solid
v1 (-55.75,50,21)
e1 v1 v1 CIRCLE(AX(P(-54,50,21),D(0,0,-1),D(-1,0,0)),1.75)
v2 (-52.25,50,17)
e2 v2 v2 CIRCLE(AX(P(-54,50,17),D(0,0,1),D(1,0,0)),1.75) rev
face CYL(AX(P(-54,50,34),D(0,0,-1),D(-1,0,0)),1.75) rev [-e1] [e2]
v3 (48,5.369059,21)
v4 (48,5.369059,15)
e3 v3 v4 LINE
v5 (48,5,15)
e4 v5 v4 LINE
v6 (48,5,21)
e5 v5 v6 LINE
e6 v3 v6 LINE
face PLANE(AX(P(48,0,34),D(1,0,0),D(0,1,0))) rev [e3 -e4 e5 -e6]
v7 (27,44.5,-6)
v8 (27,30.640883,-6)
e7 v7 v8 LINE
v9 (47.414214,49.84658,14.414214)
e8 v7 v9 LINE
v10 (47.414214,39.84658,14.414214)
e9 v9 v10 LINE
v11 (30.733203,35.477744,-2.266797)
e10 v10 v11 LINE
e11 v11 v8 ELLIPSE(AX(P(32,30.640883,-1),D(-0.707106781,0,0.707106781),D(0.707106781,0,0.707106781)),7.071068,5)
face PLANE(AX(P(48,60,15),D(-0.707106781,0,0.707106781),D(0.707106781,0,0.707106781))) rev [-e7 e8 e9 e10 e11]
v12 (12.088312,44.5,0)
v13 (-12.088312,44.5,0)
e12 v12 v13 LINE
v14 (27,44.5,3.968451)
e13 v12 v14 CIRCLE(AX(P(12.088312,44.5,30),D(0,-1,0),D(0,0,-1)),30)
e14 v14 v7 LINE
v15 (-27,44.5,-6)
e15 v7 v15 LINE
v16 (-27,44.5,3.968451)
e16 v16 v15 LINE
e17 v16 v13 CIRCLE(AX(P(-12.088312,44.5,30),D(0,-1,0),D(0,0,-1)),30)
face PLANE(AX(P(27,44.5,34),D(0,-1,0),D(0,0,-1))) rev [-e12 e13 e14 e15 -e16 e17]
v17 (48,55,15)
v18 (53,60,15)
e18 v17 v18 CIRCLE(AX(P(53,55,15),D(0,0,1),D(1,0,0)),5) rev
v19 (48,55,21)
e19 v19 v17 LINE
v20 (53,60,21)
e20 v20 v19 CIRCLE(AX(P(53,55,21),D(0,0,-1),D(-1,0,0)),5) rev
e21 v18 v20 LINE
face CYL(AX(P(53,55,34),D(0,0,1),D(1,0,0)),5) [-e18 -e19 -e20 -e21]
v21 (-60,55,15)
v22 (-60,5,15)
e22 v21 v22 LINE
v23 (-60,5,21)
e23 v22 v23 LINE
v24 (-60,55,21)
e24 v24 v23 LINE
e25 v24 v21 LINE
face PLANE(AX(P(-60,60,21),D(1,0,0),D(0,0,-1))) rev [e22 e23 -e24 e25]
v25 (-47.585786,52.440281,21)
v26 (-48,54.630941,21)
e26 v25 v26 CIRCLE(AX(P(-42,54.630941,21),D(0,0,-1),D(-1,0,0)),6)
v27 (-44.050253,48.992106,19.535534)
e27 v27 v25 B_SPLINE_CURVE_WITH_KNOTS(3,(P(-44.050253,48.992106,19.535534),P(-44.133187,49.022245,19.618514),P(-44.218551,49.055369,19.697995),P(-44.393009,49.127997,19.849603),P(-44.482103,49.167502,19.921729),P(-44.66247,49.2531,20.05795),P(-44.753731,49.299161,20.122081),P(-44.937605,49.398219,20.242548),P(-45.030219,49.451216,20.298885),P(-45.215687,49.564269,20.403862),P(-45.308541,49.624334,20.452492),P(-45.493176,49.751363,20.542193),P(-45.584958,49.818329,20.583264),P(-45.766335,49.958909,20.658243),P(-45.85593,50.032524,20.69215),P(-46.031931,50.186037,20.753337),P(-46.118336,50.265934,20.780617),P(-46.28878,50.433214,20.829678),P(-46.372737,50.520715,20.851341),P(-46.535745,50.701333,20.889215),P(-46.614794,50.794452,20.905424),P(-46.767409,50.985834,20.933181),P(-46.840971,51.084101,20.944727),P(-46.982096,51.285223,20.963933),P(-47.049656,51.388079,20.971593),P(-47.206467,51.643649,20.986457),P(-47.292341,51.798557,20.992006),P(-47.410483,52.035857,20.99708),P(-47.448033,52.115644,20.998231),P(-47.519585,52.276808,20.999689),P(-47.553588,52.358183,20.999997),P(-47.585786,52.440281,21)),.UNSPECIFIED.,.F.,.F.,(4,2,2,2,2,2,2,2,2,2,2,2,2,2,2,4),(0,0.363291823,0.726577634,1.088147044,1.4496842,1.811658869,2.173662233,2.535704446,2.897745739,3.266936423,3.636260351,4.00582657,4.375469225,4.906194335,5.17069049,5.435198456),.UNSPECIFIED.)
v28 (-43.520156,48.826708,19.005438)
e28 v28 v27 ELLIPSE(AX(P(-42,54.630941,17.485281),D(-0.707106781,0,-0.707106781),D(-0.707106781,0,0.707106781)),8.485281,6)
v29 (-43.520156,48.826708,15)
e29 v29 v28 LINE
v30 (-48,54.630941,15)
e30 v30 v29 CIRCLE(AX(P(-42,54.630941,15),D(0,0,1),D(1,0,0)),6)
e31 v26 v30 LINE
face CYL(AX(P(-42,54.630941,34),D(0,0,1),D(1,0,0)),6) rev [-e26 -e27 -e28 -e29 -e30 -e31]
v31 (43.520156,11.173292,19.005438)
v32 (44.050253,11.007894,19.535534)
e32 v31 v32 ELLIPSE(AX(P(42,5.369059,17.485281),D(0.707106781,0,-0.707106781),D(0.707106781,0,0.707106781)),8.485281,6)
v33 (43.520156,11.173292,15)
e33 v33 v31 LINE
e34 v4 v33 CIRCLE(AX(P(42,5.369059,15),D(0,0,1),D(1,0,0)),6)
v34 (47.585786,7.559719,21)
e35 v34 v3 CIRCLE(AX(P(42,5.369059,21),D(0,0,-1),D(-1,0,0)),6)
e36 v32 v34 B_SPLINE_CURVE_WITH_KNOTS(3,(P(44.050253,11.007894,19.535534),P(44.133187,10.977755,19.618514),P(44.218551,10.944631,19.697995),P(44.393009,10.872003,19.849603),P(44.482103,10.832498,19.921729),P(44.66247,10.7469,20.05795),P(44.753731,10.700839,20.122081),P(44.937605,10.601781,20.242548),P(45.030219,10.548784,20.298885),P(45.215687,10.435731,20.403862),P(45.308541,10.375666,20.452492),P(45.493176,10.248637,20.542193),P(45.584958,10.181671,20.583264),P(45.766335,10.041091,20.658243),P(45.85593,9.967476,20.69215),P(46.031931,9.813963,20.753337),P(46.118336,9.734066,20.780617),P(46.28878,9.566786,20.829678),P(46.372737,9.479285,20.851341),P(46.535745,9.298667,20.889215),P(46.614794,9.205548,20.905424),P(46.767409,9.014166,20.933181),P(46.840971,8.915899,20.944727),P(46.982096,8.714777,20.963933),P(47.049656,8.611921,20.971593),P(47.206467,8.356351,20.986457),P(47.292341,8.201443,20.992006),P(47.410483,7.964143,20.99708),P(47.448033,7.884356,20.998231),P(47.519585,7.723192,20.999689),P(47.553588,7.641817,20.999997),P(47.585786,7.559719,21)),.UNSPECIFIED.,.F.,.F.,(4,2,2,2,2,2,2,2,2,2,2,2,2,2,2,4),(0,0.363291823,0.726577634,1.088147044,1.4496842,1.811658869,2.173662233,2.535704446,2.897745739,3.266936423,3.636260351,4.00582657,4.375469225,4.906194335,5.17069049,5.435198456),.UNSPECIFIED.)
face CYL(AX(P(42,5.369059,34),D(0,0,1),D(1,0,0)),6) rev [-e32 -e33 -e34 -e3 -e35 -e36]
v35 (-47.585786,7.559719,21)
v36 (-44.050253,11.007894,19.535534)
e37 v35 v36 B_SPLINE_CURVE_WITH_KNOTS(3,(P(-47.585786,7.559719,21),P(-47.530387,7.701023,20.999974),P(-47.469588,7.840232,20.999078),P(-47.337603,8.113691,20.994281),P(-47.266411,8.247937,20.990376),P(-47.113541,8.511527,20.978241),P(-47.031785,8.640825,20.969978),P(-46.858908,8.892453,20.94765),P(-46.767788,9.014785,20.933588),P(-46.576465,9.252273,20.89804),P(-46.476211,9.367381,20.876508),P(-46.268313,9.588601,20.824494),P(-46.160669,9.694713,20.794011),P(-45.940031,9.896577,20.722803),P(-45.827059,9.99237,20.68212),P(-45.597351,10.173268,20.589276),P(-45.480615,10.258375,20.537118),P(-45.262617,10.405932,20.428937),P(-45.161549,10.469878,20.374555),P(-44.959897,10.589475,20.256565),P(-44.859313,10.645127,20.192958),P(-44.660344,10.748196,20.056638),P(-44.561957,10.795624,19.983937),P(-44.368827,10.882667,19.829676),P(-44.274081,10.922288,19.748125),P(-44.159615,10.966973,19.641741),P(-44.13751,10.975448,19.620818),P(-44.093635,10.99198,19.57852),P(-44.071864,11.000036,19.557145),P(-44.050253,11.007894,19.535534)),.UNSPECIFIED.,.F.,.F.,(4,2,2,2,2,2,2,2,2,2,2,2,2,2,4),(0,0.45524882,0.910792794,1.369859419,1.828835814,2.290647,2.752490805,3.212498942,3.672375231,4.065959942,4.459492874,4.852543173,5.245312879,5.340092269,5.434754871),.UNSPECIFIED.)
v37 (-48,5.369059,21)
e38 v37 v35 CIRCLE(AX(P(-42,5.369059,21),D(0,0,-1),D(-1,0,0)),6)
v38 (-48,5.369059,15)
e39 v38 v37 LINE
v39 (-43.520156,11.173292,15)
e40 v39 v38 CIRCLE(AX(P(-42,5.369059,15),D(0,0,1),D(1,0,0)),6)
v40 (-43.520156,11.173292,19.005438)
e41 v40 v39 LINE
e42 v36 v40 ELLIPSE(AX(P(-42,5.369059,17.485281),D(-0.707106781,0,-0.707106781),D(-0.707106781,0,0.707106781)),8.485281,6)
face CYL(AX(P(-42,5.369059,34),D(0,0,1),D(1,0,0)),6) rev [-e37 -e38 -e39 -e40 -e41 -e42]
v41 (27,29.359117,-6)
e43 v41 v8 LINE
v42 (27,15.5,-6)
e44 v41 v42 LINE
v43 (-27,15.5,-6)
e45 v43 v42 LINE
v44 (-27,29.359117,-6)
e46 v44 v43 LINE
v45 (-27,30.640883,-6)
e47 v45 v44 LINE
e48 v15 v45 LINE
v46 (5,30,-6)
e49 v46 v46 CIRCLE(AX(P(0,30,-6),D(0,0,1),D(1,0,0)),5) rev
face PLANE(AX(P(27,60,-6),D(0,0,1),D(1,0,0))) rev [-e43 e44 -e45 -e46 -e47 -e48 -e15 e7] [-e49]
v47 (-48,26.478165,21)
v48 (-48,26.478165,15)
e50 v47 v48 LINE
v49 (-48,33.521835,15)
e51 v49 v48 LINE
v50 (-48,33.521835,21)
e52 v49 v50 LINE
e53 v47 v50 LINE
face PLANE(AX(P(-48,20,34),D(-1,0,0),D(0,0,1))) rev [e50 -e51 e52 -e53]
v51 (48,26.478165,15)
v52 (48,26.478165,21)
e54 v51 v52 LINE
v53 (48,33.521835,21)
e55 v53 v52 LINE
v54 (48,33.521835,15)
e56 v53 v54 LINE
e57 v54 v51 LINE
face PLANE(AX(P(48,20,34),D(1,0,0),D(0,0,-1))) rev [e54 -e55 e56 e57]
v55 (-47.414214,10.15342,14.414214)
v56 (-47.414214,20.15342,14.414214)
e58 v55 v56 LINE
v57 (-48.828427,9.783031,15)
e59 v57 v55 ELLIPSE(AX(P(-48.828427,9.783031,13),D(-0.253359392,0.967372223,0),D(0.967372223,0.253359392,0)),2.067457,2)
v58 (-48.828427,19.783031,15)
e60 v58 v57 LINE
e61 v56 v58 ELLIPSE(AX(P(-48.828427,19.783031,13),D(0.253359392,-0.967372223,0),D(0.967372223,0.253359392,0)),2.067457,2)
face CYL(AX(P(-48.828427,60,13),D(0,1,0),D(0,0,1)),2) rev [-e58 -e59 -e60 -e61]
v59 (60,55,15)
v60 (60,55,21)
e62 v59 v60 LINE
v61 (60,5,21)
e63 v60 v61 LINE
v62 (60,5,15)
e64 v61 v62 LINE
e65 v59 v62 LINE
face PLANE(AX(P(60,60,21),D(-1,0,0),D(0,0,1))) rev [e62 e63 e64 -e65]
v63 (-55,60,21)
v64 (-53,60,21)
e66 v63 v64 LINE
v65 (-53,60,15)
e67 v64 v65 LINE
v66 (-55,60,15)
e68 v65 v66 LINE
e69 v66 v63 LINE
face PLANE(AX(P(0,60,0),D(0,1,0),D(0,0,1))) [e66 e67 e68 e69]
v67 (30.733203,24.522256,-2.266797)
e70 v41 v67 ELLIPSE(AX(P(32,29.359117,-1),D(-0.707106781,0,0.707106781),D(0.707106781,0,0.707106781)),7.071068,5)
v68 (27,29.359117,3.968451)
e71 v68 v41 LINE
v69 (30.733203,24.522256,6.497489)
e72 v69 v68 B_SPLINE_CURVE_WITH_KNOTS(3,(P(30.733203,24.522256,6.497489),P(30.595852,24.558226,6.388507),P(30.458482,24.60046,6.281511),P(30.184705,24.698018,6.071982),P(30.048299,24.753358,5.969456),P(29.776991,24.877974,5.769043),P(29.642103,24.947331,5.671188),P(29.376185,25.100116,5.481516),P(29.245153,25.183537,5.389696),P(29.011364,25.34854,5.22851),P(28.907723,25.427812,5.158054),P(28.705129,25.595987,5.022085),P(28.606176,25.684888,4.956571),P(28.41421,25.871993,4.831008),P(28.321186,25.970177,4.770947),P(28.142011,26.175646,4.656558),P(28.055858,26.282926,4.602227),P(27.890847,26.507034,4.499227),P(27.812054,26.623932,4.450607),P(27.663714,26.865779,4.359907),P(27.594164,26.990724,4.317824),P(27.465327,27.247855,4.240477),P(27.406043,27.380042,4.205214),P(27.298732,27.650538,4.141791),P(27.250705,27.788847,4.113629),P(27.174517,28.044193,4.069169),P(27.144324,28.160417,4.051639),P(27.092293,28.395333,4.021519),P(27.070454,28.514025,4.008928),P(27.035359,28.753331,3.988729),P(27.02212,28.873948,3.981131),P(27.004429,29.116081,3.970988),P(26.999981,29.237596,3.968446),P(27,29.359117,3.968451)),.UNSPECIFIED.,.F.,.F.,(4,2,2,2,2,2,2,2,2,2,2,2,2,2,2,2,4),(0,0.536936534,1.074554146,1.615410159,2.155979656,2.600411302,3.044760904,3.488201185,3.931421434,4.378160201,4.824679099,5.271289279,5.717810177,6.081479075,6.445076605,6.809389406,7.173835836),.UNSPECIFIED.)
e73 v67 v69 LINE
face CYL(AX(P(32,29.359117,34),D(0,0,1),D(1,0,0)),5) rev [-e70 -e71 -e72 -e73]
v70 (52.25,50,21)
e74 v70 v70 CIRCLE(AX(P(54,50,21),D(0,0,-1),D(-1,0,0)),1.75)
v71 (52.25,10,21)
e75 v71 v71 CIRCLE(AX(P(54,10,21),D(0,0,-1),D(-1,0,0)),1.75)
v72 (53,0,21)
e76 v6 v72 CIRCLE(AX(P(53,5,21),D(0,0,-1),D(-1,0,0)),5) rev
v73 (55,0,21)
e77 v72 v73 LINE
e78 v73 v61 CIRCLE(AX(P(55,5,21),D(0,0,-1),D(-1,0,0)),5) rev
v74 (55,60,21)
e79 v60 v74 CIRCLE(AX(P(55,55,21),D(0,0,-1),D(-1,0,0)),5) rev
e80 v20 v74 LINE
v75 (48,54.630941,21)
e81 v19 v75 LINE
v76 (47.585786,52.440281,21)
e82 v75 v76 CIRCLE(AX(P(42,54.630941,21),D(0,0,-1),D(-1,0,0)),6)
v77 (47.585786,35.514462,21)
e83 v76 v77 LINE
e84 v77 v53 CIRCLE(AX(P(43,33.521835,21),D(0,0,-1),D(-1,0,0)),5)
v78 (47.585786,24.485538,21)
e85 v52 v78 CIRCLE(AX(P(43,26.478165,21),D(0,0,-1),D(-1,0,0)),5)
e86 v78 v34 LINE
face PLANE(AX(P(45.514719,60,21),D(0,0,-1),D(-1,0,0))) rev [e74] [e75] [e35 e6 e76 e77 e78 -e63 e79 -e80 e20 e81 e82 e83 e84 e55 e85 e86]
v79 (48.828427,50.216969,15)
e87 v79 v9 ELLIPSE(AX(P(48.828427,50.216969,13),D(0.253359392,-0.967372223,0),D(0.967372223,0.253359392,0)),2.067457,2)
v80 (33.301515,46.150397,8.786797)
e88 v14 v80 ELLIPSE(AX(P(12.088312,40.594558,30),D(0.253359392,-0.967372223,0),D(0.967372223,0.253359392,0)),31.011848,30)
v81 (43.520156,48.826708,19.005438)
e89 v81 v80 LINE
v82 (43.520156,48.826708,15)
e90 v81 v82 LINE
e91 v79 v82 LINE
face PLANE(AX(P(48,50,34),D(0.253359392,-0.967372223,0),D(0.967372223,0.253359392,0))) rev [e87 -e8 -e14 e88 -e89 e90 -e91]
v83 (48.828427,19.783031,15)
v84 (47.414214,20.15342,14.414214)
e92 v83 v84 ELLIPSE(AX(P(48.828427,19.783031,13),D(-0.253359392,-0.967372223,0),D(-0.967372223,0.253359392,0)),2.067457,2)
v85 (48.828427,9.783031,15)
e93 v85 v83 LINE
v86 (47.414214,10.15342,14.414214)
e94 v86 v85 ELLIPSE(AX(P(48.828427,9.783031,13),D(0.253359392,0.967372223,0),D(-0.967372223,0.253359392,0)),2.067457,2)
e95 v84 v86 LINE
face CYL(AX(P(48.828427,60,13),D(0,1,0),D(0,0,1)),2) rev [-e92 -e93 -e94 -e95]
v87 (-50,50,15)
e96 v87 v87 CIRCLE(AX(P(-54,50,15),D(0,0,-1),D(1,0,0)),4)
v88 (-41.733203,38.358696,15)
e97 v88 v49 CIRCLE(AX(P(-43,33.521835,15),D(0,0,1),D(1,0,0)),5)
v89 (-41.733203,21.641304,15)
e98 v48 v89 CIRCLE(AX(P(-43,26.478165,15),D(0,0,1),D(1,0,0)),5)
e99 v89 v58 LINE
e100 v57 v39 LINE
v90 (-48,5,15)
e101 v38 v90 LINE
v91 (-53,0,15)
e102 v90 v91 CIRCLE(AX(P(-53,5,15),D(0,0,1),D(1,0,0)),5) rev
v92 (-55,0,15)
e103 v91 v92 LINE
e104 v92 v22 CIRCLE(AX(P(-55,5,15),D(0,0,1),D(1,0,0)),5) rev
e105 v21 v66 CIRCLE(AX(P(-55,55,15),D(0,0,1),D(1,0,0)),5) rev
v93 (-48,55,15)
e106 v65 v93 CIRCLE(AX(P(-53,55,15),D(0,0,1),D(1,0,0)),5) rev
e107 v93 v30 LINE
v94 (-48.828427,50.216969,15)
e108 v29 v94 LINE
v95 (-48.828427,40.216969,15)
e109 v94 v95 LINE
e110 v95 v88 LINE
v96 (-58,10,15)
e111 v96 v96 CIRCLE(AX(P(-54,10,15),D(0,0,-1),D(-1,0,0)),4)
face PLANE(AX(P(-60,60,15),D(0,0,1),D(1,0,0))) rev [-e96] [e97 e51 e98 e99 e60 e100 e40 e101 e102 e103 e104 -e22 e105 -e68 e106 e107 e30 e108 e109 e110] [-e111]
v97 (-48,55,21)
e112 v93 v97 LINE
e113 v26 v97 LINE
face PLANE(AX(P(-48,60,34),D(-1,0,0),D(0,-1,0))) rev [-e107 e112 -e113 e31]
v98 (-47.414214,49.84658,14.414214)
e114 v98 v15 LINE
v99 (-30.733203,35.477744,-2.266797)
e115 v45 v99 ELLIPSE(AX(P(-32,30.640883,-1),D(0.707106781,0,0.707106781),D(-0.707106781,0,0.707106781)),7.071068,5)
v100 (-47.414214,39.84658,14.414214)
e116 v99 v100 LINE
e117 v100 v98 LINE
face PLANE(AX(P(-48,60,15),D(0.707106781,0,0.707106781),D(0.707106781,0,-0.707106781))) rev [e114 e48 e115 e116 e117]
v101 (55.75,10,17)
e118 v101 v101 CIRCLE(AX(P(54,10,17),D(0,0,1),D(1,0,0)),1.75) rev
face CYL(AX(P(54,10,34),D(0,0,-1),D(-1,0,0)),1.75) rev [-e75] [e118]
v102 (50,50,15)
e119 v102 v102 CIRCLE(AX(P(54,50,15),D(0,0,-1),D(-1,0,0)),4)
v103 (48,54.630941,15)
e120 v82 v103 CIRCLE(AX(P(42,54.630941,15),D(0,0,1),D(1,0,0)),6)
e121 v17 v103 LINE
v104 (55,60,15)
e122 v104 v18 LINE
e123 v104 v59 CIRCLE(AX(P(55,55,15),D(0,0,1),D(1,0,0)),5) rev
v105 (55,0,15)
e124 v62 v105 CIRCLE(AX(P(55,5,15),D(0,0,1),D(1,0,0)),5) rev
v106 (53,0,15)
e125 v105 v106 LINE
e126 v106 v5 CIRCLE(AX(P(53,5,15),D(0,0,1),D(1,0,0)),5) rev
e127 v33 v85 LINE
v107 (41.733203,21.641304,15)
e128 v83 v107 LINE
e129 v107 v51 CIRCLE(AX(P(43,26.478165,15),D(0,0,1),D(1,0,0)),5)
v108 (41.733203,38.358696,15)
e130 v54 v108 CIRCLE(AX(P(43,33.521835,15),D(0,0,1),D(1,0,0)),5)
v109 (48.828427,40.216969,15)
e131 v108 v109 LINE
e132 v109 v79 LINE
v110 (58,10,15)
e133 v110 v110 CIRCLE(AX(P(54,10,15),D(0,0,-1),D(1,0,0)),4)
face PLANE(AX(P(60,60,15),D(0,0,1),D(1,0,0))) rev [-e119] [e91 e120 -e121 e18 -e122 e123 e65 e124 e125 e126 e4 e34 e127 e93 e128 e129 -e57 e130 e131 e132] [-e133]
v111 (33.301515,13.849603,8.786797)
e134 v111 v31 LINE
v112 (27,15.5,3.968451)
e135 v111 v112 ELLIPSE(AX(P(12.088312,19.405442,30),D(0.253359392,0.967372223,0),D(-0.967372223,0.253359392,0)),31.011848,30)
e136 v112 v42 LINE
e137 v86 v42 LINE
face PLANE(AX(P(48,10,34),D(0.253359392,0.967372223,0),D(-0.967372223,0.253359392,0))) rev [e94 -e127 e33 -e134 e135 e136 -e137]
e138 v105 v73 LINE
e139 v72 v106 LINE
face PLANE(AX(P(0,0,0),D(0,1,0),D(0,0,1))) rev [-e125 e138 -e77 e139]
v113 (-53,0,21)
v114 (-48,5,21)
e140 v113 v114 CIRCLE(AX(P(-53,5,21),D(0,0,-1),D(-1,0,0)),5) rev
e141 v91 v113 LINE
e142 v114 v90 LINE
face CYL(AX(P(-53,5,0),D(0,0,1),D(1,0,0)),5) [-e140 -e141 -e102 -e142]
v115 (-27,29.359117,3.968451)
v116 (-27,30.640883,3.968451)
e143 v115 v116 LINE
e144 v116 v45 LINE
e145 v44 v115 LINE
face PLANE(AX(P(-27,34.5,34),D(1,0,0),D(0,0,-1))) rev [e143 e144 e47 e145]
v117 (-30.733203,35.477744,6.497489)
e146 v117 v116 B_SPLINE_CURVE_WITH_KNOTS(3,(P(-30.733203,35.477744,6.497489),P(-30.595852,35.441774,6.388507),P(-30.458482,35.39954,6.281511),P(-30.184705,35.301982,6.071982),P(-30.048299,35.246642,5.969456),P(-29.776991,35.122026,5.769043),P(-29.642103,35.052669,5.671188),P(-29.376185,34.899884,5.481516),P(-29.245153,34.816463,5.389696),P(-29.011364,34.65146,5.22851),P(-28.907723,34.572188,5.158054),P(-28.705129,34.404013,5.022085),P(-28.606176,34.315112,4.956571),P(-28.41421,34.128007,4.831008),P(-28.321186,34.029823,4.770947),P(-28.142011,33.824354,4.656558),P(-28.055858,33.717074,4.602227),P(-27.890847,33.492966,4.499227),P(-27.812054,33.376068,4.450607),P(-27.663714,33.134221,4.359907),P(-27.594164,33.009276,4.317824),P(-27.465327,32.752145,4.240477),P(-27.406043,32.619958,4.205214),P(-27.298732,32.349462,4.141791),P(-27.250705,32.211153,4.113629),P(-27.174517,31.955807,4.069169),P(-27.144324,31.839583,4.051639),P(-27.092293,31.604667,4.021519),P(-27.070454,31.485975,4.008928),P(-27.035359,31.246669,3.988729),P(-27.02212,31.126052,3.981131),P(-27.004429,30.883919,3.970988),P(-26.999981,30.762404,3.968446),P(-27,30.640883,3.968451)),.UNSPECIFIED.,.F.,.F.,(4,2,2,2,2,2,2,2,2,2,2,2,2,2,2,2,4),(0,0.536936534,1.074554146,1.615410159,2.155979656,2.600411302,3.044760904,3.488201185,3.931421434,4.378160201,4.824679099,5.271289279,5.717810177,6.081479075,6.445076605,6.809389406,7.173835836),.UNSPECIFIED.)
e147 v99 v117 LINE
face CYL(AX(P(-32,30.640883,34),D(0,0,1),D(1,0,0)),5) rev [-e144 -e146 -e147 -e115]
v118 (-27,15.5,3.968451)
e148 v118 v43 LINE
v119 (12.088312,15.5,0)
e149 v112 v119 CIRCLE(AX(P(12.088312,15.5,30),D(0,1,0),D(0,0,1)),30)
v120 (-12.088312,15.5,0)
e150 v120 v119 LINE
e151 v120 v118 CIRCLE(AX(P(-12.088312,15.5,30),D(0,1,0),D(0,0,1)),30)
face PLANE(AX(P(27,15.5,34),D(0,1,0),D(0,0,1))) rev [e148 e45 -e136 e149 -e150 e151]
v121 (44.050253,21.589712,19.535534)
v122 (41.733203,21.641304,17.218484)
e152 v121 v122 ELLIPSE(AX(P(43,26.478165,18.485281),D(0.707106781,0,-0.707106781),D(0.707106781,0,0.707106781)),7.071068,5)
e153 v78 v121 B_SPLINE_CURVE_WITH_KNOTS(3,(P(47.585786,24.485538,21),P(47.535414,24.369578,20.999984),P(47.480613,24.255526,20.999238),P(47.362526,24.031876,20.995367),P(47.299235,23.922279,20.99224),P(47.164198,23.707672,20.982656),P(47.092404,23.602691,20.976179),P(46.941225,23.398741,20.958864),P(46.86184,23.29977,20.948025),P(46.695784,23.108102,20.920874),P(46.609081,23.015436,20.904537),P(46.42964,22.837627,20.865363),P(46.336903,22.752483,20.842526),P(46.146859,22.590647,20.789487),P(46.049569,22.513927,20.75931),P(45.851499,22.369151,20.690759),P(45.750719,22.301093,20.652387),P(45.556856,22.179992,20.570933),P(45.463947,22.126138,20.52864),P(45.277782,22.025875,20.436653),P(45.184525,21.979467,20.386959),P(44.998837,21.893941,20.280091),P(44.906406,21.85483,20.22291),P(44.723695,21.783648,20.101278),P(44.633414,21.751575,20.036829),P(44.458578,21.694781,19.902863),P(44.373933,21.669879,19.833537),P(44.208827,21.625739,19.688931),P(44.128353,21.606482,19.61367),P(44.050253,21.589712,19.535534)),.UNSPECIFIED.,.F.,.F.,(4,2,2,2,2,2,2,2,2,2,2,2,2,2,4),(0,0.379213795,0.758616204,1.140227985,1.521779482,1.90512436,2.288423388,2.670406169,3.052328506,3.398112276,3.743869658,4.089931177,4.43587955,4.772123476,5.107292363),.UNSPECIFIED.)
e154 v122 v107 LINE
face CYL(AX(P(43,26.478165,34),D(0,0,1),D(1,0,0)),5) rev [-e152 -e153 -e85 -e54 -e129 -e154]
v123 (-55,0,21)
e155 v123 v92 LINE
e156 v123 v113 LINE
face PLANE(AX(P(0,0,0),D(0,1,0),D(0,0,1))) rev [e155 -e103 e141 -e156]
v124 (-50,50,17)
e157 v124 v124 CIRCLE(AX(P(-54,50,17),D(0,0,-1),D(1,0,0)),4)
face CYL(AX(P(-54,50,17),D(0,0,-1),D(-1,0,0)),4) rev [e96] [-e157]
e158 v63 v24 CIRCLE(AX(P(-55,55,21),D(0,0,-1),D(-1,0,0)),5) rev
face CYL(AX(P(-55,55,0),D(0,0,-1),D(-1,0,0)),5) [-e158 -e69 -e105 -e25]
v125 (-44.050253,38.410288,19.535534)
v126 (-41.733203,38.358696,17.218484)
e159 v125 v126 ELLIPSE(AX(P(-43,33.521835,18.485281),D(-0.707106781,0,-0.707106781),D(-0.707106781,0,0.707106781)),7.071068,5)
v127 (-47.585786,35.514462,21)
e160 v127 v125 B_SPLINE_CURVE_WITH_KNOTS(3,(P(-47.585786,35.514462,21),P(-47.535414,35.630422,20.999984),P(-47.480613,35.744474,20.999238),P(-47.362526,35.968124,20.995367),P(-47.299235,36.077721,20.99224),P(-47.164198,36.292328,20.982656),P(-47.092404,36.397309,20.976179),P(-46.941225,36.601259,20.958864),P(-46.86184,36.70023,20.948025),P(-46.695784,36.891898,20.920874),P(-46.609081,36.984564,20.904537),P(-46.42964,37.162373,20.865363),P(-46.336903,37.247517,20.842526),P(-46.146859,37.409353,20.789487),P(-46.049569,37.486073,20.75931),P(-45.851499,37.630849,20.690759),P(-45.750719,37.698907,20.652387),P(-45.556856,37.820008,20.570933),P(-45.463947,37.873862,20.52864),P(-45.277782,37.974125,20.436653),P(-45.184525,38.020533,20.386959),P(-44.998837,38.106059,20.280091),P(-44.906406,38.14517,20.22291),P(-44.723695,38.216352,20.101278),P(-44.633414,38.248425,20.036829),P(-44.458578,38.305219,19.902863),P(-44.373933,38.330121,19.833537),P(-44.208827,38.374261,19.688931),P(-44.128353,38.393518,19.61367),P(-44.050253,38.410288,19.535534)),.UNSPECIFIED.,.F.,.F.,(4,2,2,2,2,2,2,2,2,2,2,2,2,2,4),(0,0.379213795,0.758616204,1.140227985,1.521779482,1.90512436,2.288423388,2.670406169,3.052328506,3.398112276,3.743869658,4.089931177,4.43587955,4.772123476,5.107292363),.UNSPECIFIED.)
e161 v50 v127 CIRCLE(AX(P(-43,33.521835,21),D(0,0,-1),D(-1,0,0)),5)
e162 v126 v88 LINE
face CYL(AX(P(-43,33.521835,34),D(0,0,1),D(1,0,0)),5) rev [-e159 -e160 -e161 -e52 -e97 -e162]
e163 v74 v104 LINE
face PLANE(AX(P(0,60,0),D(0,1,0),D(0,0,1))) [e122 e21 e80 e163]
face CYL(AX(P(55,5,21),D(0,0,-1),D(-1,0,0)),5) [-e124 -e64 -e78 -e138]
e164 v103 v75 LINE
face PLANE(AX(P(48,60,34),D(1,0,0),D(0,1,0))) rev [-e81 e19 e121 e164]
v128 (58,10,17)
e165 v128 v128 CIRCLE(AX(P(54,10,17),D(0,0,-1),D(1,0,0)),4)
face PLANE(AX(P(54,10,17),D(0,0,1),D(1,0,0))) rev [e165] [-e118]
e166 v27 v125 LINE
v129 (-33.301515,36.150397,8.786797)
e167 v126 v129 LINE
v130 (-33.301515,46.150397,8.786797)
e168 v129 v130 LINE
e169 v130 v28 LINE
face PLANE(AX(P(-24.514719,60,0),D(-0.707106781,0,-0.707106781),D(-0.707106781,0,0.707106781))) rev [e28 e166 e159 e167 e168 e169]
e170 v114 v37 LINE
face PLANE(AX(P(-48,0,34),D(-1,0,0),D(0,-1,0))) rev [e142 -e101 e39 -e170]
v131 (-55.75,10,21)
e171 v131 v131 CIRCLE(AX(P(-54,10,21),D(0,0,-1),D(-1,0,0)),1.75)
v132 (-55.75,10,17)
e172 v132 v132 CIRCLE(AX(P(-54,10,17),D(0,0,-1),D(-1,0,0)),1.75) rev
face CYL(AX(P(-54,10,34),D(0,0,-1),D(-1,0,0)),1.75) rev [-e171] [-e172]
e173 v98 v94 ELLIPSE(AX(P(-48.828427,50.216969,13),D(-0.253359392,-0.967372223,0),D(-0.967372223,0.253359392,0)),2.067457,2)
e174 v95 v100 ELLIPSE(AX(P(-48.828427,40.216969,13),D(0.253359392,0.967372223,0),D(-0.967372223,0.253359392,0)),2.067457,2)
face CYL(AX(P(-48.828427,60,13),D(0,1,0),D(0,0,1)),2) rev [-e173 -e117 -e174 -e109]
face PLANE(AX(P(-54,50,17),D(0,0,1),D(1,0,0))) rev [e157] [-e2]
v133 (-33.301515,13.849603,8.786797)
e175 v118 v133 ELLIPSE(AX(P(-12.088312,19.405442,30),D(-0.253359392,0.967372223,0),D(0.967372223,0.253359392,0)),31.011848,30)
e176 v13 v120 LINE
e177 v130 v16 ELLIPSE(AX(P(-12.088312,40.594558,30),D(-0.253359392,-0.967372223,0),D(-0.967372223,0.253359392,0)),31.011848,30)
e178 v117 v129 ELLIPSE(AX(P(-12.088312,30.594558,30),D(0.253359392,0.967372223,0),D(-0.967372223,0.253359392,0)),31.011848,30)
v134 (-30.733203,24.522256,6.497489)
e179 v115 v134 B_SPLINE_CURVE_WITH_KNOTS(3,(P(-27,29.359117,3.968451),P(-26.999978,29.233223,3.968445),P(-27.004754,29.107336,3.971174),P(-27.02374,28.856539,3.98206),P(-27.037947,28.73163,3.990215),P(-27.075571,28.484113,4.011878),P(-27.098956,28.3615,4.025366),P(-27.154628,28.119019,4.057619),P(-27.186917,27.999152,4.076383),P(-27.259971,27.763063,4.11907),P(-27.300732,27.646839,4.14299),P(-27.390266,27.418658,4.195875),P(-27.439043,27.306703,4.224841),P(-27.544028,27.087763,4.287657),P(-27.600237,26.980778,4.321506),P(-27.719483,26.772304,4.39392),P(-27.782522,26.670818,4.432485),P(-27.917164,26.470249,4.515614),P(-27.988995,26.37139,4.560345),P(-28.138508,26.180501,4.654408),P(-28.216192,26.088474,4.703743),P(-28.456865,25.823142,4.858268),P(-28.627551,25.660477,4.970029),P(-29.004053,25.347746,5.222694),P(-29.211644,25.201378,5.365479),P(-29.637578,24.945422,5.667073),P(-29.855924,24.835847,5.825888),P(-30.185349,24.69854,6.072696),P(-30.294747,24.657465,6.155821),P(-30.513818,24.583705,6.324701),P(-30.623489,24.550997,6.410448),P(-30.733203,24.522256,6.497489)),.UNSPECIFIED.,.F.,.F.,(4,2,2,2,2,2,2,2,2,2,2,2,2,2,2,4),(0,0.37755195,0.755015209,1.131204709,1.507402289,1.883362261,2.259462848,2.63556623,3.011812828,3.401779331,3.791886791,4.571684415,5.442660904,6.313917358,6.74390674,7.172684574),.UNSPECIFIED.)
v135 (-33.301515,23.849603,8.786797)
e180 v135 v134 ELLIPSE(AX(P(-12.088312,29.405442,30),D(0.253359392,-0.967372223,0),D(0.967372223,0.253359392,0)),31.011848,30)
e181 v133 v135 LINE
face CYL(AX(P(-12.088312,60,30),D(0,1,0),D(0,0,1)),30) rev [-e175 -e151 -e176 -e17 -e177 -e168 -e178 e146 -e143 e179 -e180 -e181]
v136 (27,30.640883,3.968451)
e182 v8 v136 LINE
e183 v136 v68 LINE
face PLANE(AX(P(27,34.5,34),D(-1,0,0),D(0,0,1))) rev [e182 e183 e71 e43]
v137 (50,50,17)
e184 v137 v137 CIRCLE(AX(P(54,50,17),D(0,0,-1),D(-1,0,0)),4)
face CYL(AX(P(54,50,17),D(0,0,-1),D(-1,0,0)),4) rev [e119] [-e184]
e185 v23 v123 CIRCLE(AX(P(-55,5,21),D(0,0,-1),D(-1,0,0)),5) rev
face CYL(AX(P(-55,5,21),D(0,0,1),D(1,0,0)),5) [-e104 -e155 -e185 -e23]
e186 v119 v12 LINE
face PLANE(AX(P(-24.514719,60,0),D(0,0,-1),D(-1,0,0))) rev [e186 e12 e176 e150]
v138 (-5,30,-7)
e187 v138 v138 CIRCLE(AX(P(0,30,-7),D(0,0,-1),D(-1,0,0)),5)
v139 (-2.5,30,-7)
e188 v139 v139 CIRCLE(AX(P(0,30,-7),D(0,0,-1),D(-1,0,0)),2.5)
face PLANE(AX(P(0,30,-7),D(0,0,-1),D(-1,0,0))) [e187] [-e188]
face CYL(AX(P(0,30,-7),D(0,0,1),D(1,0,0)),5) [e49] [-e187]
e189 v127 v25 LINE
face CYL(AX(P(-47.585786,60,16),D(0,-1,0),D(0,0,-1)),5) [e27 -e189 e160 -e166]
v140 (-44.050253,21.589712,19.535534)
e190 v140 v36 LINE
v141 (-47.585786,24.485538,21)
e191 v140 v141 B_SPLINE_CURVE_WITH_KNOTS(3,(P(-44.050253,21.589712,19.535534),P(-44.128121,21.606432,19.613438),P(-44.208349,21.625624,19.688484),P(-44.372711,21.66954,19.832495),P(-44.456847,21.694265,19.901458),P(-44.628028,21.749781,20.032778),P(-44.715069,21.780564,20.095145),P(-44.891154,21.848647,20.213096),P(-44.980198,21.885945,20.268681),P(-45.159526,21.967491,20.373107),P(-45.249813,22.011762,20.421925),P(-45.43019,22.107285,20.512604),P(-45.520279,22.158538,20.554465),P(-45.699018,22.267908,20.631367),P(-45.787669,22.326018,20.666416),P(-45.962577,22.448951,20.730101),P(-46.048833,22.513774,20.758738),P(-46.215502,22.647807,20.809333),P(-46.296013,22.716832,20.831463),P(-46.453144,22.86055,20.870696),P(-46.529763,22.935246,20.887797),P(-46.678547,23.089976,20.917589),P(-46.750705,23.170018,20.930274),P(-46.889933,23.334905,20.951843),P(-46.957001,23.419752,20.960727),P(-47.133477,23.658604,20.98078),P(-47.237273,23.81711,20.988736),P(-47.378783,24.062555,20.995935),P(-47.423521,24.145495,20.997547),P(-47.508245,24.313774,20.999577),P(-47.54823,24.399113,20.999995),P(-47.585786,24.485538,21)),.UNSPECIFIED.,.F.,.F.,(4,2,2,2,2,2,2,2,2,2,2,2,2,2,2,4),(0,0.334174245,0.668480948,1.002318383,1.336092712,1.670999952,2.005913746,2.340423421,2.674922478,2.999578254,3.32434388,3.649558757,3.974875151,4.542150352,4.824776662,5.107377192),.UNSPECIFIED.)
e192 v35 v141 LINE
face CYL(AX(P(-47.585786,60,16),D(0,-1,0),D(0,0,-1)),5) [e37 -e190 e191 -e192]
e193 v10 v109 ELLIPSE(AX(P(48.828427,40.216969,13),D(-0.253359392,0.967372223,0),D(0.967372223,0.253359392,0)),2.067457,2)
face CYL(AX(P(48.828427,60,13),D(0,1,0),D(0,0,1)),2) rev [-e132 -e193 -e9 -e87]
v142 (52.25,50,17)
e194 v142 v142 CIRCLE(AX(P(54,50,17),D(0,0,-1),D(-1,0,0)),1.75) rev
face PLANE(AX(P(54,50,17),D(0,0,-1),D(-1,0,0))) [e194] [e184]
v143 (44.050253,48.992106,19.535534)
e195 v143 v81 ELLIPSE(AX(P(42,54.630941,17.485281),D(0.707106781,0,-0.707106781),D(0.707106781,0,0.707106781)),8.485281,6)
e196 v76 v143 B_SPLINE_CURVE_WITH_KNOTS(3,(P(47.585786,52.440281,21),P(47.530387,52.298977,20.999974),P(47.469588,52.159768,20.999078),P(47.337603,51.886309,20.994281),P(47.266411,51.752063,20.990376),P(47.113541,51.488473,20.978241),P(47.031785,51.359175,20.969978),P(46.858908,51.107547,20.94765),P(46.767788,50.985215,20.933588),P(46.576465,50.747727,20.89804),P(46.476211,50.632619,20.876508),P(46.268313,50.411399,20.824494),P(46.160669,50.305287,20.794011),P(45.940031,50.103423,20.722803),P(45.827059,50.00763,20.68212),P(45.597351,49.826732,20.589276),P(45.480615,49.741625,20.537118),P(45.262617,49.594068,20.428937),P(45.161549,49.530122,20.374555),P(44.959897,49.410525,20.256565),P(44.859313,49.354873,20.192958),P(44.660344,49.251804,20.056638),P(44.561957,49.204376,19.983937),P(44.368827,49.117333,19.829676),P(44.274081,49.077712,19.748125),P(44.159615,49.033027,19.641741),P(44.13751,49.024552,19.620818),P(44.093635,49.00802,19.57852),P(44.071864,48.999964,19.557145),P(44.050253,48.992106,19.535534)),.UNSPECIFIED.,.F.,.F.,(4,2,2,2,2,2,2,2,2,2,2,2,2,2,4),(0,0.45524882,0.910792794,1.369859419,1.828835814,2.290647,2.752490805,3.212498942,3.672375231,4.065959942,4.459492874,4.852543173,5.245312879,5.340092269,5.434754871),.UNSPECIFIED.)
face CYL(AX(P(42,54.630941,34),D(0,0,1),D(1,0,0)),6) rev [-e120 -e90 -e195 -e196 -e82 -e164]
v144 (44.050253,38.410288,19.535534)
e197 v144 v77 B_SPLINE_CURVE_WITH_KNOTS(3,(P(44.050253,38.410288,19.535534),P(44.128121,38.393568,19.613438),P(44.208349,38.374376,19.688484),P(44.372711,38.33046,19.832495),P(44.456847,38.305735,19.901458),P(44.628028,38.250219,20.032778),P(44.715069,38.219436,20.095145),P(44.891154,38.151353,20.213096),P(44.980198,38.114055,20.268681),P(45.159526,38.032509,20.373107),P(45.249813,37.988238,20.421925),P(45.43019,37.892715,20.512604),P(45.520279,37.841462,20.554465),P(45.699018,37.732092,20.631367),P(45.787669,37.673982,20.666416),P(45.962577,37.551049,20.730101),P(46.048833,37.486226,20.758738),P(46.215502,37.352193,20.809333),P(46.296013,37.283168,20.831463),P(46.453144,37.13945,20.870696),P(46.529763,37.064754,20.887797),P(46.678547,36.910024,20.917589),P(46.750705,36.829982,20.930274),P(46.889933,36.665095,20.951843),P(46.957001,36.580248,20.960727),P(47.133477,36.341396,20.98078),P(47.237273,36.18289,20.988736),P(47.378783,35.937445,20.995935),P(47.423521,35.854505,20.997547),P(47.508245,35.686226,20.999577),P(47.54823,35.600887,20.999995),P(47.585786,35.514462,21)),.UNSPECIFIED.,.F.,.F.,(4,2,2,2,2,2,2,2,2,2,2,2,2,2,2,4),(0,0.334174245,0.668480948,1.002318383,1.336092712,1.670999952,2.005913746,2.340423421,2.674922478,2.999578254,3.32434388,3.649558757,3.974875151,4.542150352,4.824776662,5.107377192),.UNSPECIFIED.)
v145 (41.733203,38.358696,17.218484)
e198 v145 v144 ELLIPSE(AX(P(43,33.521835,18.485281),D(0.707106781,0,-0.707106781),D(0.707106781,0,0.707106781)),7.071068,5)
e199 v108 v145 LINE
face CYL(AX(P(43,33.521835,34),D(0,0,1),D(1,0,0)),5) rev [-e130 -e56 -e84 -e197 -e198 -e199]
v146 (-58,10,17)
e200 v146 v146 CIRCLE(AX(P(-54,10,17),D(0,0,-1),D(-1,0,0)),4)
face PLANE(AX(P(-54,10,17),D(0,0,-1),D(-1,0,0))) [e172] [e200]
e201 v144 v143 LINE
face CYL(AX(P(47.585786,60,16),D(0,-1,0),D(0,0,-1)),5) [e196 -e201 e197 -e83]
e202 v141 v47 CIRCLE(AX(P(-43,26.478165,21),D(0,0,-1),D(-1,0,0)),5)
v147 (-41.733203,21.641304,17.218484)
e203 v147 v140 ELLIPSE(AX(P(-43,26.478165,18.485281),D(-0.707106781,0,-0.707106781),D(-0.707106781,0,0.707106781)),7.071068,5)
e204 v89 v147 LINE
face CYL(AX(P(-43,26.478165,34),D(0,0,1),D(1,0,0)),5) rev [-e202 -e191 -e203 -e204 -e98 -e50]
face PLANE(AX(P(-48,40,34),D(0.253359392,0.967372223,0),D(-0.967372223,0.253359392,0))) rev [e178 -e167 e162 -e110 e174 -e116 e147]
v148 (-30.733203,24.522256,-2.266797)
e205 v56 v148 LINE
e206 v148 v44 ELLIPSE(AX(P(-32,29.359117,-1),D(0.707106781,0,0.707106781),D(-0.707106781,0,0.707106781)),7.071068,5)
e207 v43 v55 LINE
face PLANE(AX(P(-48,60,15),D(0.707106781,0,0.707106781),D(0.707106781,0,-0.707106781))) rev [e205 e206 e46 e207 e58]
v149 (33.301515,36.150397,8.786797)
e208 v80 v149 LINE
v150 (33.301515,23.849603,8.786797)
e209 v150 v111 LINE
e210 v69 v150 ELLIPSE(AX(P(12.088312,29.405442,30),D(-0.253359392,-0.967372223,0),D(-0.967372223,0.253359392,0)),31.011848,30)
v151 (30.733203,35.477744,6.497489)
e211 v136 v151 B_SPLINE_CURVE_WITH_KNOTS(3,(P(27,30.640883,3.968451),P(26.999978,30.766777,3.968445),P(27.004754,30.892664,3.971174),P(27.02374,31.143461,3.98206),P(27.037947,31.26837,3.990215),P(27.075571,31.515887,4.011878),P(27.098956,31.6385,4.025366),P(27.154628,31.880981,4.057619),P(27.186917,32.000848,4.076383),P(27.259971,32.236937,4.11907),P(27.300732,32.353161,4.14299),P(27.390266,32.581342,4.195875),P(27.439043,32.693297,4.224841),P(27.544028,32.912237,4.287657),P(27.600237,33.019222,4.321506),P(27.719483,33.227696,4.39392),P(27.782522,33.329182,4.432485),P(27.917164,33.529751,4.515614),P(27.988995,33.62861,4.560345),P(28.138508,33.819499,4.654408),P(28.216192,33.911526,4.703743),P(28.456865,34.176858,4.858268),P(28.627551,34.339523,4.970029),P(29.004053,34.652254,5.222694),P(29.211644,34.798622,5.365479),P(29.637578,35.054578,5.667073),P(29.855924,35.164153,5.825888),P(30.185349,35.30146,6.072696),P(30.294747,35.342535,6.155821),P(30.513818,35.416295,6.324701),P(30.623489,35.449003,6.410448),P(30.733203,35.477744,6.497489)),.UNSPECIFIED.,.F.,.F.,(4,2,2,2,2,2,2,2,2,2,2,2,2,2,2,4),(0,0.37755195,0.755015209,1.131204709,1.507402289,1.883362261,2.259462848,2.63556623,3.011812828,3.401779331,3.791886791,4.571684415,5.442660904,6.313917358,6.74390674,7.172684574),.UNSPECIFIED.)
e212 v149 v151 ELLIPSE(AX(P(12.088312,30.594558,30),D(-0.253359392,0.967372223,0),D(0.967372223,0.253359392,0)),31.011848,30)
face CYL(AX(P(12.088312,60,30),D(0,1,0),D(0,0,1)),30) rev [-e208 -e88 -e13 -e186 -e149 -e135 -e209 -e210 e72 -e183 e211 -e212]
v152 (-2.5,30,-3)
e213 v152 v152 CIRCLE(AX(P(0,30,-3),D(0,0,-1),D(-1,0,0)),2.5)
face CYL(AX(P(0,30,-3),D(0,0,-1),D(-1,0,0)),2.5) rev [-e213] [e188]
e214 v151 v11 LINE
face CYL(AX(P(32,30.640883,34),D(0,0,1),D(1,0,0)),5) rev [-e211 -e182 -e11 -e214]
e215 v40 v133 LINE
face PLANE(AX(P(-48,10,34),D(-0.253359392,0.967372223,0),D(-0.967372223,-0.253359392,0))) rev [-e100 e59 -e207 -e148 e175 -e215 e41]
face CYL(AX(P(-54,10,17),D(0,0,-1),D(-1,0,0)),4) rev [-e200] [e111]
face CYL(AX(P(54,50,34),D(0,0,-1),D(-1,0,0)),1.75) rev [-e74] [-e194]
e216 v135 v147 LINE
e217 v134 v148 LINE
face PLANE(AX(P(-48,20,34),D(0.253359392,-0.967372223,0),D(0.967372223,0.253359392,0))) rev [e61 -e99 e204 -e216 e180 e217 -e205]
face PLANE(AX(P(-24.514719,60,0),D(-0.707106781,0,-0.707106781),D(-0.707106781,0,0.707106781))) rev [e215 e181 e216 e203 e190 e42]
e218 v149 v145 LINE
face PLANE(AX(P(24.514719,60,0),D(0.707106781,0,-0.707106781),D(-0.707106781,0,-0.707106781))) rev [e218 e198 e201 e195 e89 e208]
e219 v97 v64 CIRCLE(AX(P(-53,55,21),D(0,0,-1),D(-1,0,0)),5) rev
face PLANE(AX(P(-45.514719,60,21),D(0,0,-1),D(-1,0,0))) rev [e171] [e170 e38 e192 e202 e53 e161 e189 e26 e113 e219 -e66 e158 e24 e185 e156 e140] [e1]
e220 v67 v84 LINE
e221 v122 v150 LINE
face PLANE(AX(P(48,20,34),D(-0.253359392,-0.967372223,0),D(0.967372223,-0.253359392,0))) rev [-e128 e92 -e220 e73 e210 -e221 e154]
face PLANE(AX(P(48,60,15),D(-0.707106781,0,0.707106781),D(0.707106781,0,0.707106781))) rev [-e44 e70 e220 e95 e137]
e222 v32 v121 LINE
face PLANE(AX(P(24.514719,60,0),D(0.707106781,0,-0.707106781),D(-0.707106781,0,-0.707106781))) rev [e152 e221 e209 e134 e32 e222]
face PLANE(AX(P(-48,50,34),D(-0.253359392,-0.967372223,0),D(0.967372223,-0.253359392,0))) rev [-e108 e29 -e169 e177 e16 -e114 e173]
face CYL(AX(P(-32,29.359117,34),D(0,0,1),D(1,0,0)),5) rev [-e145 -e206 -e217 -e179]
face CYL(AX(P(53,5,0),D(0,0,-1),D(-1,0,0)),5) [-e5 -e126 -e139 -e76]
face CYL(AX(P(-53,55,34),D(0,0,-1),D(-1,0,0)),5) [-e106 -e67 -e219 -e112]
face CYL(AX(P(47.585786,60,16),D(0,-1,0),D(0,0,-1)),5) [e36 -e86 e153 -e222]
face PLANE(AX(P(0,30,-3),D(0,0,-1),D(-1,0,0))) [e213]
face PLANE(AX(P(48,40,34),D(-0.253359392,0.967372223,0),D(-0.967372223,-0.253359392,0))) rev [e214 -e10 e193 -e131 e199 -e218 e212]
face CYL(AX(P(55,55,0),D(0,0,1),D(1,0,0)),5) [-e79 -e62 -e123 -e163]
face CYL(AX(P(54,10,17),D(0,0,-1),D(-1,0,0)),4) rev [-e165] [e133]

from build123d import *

# Parameters (mm, degrees)
EXTRUDE_1_DEPTH     = 60
SKETCH_2_R          = 1.75
CUT_EXTRUDE_1_DEPTH = 40
SKETCH_3_R          = 4
CUT_EXTRUDE_2_DEPTH = 2
SKETCH_4_R          = 2.5
CUT_EXTRUDE_3_DEPTH = 3
EXTRUDE_START       = 1
SKETCH_5_R          = 5
SKETCH_5_R_2        = 2.5
EXTRUDE_2_DEPTH     = 1
FILLET_1_R          = 5
FILLET_2_R          = 30
FILLET_4_R          = 2
FILLET_5_R          = 5
FILLET_6_R          = 6
FILLET_7_R          = 5


with BuildPart() as part:
    # 草图1 → 凸台-拉伸1 (new body)
    with BuildSketch(Plane(origin=(0, 0, 0), x_dir=(1, 0, 0), z_dir=(0, 1, 0))):
        Polygon((-24.514718626, 0), (24.514718626, 0), (45.514718626, -21), (60, -21), (60, -15), (48, -15), (27, 6), (-27, 6), (-48, -15), (-60, -15), (-60, -21), (-45.514718626, -21), align=None)
    extrude(amount=EXTRUDE_1_DEPTH)

    # 草图2 → 切除-拉伸1 (cut)
    with BuildSketch(Plane(origin=(0, 0, -6), x_dir=(-1, 0, 0), z_dir=(0, 0, -1))):
        with Locations((-54, 50)):
            Circle(SKETCH_2_R)
        with Locations((-54, 10)):
            Circle(SKETCH_2_R)
        with Locations((54, 10)):
            Circle(SKETCH_2_R)
        with Locations((54, 50)):
            Circle(SKETCH_2_R)
        Polygon((-48, 60), (-48, 50), (-27, 44.5), (27, 44.5), (48, 50), (48, 60), align=None)
        Polygon((48, 0), (48, 10), (27, 15.5), (-27, 15.5), (-48, 10), (-48, 0), align=None)
        Polygon((-48, 40), (-27, 34.5), (-27, 25.5), (-48, 20), align=None)
        Polygon((48, 20), (27, 25.5), (27, 34.5), (48, 40), align=None)
    extrude(amount=-CUT_EXTRUDE_1_DEPTH, mode=Mode.SUBTRACT)

    # 草图3 → 切除-拉伸2 (cut)
    with BuildSketch(Plane(origin=(0, 0, 15), x_dir=(-1, 0, 0), z_dir=(0, 0, -1))):
        with Locations((-54, 50)):
            Circle(SKETCH_3_R)
        with Locations(Location((-54, 10, 0), (0, 0, 180))):
            Circle(SKETCH_3_R)
        with Locations((54, 10)):
            Circle(SKETCH_3_R)
        with Locations(Location((54, 50, 0), (0, 0, 180))):
            Circle(SKETCH_3_R)
    extrude(amount=-CUT_EXTRUDE_2_DEPTH, mode=Mode.SUBTRACT)

    # 草图4 → 切除-拉伸3 (cut)
    with BuildSketch(Plane(origin=(0, 0, -6), x_dir=(-1, 0, 0), z_dir=(0, 0, -1))):
        with Locations((0, 30)):
            Circle(SKETCH_4_R)
    extrude(amount=-CUT_EXTRUDE_3_DEPTH, mode=Mode.SUBTRACT)

    # 草图5 → 凸台-拉伸2 (add)
    with BuildSketch(Plane(origin=(0, 0, -6), x_dir=(-1, 0, 0), z_dir=(0, 0, -1)).offset(EXTRUDE_START)):
        with Locations(Location((0, 30, 0), (0, 0, 180))):
            Circle(SKETCH_5_R)
        with Locations((0, 30)):
            Circle(SKETCH_5_R_2, mode=Mode.SUBTRACT)
    extrude(amount=-EXTRUDE_2_DEPTH)

    # 圆角1
    fillet_1_edges = [part.edges().sort_by_distance(p)[0] for p in [
        (60, 60, 18),
        (-60, 0, 18),
        (60, 0, 18),
        (-48, 0, 18),
        (48, 0, 18),
        (-60, 60, 18),
        (48, 60, 18),
        (-48, 60, 18),
    ]]
    fillet(fillet_1_edges, radius=FILLET_1_R)

    # 圆角2
    # the kernel refuses this fillet: 30 mm, written as the material it adds along each edge
    with BuildSketch(Plane(origin=(-24.514718626, -15.566017178, 0), x_dir=(-0.7071067811865465, 0, 0.7071067811865487), z_dir=(0, 1, 0))) as fillet_2_piece_1_section:
        with BuildLine():
            CenterArc((FILLET_2_R * 0.414213562373, FILLET_2_R), FILLET_2_R, 225, 45)
            Line((-FILLET_2_R * 0.292893218813, FILLET_2_R * 0.292893218813), (0, 0))
            Line((0, 0), (FILLET_2_R * 0.414213562373, 0))
        make_face()
    fillet_2_piece_1 = extrude(amount=91.132034356, mode=Mode.PRIVATE)
    fillet_2_piece_1 = split(fillet_2_piece_1, bisect_by=Plane(origin=(-29.494529343, 14.846670886, 5.3692292), z_dir=(-0.25335939183768474, 0.967372223380245, 0)), keep=Keep.TOP, mode=Mode.PRIVATE)
    fillet_2_piece_1 = split(fillet_2_piece_1, bisect_by=Plane(origin=(-31.945457725, 24.204761072, 5.3692292), z_dir=(0.2533593918376857, -0.9673722233802448, 0)), keep=Keep.TOP, mode=Mode.PRIVATE)
    add(fillet_2_piece_1)
    with BuildSketch(Plane(origin=(-24.514718626, 15.5, 0), x_dir=(-0.7071067811865465, 0, 0.7071067811865487), z_dir=(0, 1, 0))) as fillet_2_piece_2_section:
        with BuildLine():
            CenterArc((FILLET_2_R * 0.414213562373, FILLET_2_R), FILLET_2_R, 225, 45)
            Line((-FILLET_2_R * 0.292893218813, FILLET_2_R * 0.292893218813), (0, 0))
            Line((0, 0), (FILLET_2_R * 0.414213562373, 0))
        make_face()
    fillet_2_piece_2 = extrude(amount=29, mode=Mode.PRIVATE)
    fillet_2_piece_2 = split(fillet_2_piece_2, bisect_by=Plane(origin=(-27, 16.298150863, 0.780837191), z_dir=(1, 0, 0)), keep=Keep.TOP, mode=Mode.PRIVATE)
    add(fillet_2_piece_2)
    with BuildSketch(Plane(origin=(-24.514718626, -15.566017178, 0), x_dir=(-0.7071067811865465, 0, 0.7071067811865487), z_dir=(0, 1, 0))) as fillet_2_piece_3_section:
        with BuildLine():
            CenterArc((FILLET_2_R * 0.414213562373, FILLET_2_R), FILLET_2_R, 225, 45)
            Line((-FILLET_2_R * 0.292893218813, FILLET_2_R * 0.292893218813), (0, 0))
            Line((0, 0), (FILLET_2_R * 0.414213562373, 0))
        make_face()
    fillet_2_piece_3 = extrude(amount=91.132034356, mode=Mode.PRIVATE)
    fillet_2_piece_3 = split(fillet_2_piece_3, bisect_by=Plane(origin=(-29.759175244, 35.222641135, 4.528426502), z_dir=(0.25335939183768585, 0.9673722233802448, 0)), keep=Keep.TOP, mode=Mode.PRIVATE)
    fillet_2_piece_3 = split(fillet_2_piece_3, bisect_by=Plane(origin=(-27.308246862, 44.580731321, 4.528426502), z_dir=(-0.2533593918376847, -0.967372223380245, 0)), keep=Keep.TOP, mode=Mode.PRIVATE)
    add(fillet_2_piece_3)
    with BuildSketch(Plane(origin=(24.514718626, -15.566017178, 0), x_dir=(0.7071067811865461, 0, 0.7071067811865488), z_dir=(0, 1, 0))) as fillet_2_piece_4_section:
        with BuildLine():
            CenterArc((FILLET_2_R * 0.414213562373, -FILLET_2_R), FILLET_2_R, 90, 45)
            Line((-FILLET_2_R * 0.292893218813, -FILLET_2_R * 0.292893218813), (0, 0))
            Line((0, 0), (FILLET_2_R * 0.414213562373, 0))
        make_face()
    fillet_2_piece_4 = extrude(amount=91.132034356, mode=Mode.PRIVATE)
    fillet_2_piece_4 = split(fillet_2_piece_4, bisect_by=Plane(origin=(29.494529343, 14.846670886, 5.3692292), z_dir=(0.25335939183768474, 0.967372223380245, 0)), keep=Keep.TOP, mode=Mode.PRIVATE)
    fillet_2_piece_4 = split(fillet_2_piece_4, bisect_by=Plane(origin=(31.945457725, 24.204761072, 5.3692292), z_dir=(-0.25335939183768474, -0.967372223380245, 0)), keep=Keep.TOP, mode=Mode.PRIVATE)
    add(fillet_2_piece_4)
    with BuildSketch(Plane(origin=(24.514718626, 15.5, 0), x_dir=(0.7071067811865461, 0, 0.7071067811865488), z_dir=(0, 1, 0))) as fillet_2_piece_5_section:
        with BuildLine():
            CenterArc((FILLET_2_R * 0.414213562373, -FILLET_2_R), FILLET_2_R, 90, 45)
            Line((-FILLET_2_R * 0.292893218813, -FILLET_2_R * 0.292893218813), (0, 0))
            Line((0, 0), (FILLET_2_R * 0.414213562373, 0))
        make_face()
    fillet_2_piece_5 = extrude(amount=60.066017178, mode=Mode.PRIVATE)
    fillet_2_piece_5 = split(fillet_2_piece_5, bisect_by=Plane(origin=(27, 16.298150863, 0.780837191), z_dir=(-1, 0, 0)), keep=Keep.TOP, mode=Mode.PRIVATE)
    fillet_2_piece_5 = split(fillet_2_piece_5, bisect_by=Plane(origin=(14.384200648, 41.195862074, 0.780837191), z_dir=(0.2533593918376847, -0.967372223380245, 0)), keep=Keep.TOP, mode=Mode.PRIVATE)
    add(fillet_2_piece_5)
    with BuildSketch(Plane(origin=(24.514718626, -15.566017178, 0), x_dir=(0.7071067811865461, 0, 0.7071067811865488), z_dir=(0, 1, 0))) as fillet_2_piece_6_section:
        with BuildLine():
            CenterArc((FILLET_2_R * 0.414213562373, -FILLET_2_R), FILLET_2_R, 90, 45)
            Line((-FILLET_2_R * 0.292893218813, -FILLET_2_R * 0.292893218813), (0, 0))
            Line((0, 0), (FILLET_2_R * 0.414213562373, 0))
        make_face()
    fillet_2_piece_6 = extrude(amount=91.132034356, mode=Mode.PRIVATE)
    fillet_2_piece_6 = split(fillet_2_piece_6, bisect_by=Plane(origin=(29.759175244, 35.222641135, 4.528426502), z_dir=(-0.2533593918376849, 0.967372223380245, 0)), keep=Keep.TOP, mode=Mode.PRIVATE)
    fillet_2_piece_6 = split(fillet_2_piece_6, bisect_by=Plane(origin=(27.308246862, 44.580731321, 4.528426502), z_dir=(0.2533593918376847, -0.967372223380245, 0)), keep=Keep.TOP, mode=Mode.PRIVATE)
    add(fillet_2_piece_6)
    with BuildSketch(Plane(origin=(24.514718626, -15.566017178, 0), x_dir=(0.7071067811865461, 0, 0.7071067811865488), z_dir=(0, 1, 0))) as fillet_2_piece_7_section:
        with BuildLine():
            CenterArc((FILLET_2_R * 0.414213562373, -FILLET_2_R), FILLET_2_R, 90, 45)
            Line((-FILLET_2_R * 0.292893218813, -FILLET_2_R * 0.292893218813), (0, 0))
            Line((0, 0), (FILLET_2_R * 0.414213562373, 0))
        make_face()
    fillet_2_piece_7 = extrude(amount=60.066017178, mode=Mode.PRIVATE)
    fillet_2_piece_7 = split(fillet_2_piece_7, bisect_by=Plane(origin=(21.100650835, 42.954932361, 0.780837191), z_dir=(-0.2533593918376847, 0.967372223380245, 0)), keep=Keep.TOP, mode=Mode.PRIVATE)
    add(fillet_2_piece_7)

    # 圆角4
    fillet_4_edges = [part.edges().sort_by_distance(p)[0] for p in [
        (-48, 45, 15),
        (-48, 15, 15),
        (48, 45, 15),
        (48, 15, 15),
    ]]
    fillet(fillet_4_edges, radius=FILLET_4_R)

    # 圆角5
    fillet_5_edges = [part.edges().sort_by_distance(p)[0] for p in [
        (-45.514718626, 44.349092973, 21),
        (-45.514718626, 15.650907027, 21),
        (45.514718626, 44.349092973, 21),
        (45.514718626, 15.650907027, 21),
    ]]
    fillet(fillet_5_edges, radius=FILLET_5_R)

    # 圆角6
    fillet_6_edges = [part.edges().sort_by_distance(p)[0] for p in [
        (48, 50, 18),
        (-48, 50, 18),
        (-48, 10, 18),
        (48, 10, 18),
    ]]
    fillet(fillet_6_edges, radius=FILLET_6_R)

    # 圆角7
    fillet_7_edges = [part.edges().sort_by_distance(p)[0] for p in [
        (-48, 20, 18),
        (-48, 40, 18),
        (48, 40, 18),
        (48, 20, 18),
        (27, 25.5, -1.015774599),
        (27, 34.5, -1.015774599),
        (-27, 25.5, -1.015774599),
        (-27, 34.5, -1.015774599),
    ]]
    fillet(fillet_7_edges, radius=FILLET_7_R)


solid = part.part
